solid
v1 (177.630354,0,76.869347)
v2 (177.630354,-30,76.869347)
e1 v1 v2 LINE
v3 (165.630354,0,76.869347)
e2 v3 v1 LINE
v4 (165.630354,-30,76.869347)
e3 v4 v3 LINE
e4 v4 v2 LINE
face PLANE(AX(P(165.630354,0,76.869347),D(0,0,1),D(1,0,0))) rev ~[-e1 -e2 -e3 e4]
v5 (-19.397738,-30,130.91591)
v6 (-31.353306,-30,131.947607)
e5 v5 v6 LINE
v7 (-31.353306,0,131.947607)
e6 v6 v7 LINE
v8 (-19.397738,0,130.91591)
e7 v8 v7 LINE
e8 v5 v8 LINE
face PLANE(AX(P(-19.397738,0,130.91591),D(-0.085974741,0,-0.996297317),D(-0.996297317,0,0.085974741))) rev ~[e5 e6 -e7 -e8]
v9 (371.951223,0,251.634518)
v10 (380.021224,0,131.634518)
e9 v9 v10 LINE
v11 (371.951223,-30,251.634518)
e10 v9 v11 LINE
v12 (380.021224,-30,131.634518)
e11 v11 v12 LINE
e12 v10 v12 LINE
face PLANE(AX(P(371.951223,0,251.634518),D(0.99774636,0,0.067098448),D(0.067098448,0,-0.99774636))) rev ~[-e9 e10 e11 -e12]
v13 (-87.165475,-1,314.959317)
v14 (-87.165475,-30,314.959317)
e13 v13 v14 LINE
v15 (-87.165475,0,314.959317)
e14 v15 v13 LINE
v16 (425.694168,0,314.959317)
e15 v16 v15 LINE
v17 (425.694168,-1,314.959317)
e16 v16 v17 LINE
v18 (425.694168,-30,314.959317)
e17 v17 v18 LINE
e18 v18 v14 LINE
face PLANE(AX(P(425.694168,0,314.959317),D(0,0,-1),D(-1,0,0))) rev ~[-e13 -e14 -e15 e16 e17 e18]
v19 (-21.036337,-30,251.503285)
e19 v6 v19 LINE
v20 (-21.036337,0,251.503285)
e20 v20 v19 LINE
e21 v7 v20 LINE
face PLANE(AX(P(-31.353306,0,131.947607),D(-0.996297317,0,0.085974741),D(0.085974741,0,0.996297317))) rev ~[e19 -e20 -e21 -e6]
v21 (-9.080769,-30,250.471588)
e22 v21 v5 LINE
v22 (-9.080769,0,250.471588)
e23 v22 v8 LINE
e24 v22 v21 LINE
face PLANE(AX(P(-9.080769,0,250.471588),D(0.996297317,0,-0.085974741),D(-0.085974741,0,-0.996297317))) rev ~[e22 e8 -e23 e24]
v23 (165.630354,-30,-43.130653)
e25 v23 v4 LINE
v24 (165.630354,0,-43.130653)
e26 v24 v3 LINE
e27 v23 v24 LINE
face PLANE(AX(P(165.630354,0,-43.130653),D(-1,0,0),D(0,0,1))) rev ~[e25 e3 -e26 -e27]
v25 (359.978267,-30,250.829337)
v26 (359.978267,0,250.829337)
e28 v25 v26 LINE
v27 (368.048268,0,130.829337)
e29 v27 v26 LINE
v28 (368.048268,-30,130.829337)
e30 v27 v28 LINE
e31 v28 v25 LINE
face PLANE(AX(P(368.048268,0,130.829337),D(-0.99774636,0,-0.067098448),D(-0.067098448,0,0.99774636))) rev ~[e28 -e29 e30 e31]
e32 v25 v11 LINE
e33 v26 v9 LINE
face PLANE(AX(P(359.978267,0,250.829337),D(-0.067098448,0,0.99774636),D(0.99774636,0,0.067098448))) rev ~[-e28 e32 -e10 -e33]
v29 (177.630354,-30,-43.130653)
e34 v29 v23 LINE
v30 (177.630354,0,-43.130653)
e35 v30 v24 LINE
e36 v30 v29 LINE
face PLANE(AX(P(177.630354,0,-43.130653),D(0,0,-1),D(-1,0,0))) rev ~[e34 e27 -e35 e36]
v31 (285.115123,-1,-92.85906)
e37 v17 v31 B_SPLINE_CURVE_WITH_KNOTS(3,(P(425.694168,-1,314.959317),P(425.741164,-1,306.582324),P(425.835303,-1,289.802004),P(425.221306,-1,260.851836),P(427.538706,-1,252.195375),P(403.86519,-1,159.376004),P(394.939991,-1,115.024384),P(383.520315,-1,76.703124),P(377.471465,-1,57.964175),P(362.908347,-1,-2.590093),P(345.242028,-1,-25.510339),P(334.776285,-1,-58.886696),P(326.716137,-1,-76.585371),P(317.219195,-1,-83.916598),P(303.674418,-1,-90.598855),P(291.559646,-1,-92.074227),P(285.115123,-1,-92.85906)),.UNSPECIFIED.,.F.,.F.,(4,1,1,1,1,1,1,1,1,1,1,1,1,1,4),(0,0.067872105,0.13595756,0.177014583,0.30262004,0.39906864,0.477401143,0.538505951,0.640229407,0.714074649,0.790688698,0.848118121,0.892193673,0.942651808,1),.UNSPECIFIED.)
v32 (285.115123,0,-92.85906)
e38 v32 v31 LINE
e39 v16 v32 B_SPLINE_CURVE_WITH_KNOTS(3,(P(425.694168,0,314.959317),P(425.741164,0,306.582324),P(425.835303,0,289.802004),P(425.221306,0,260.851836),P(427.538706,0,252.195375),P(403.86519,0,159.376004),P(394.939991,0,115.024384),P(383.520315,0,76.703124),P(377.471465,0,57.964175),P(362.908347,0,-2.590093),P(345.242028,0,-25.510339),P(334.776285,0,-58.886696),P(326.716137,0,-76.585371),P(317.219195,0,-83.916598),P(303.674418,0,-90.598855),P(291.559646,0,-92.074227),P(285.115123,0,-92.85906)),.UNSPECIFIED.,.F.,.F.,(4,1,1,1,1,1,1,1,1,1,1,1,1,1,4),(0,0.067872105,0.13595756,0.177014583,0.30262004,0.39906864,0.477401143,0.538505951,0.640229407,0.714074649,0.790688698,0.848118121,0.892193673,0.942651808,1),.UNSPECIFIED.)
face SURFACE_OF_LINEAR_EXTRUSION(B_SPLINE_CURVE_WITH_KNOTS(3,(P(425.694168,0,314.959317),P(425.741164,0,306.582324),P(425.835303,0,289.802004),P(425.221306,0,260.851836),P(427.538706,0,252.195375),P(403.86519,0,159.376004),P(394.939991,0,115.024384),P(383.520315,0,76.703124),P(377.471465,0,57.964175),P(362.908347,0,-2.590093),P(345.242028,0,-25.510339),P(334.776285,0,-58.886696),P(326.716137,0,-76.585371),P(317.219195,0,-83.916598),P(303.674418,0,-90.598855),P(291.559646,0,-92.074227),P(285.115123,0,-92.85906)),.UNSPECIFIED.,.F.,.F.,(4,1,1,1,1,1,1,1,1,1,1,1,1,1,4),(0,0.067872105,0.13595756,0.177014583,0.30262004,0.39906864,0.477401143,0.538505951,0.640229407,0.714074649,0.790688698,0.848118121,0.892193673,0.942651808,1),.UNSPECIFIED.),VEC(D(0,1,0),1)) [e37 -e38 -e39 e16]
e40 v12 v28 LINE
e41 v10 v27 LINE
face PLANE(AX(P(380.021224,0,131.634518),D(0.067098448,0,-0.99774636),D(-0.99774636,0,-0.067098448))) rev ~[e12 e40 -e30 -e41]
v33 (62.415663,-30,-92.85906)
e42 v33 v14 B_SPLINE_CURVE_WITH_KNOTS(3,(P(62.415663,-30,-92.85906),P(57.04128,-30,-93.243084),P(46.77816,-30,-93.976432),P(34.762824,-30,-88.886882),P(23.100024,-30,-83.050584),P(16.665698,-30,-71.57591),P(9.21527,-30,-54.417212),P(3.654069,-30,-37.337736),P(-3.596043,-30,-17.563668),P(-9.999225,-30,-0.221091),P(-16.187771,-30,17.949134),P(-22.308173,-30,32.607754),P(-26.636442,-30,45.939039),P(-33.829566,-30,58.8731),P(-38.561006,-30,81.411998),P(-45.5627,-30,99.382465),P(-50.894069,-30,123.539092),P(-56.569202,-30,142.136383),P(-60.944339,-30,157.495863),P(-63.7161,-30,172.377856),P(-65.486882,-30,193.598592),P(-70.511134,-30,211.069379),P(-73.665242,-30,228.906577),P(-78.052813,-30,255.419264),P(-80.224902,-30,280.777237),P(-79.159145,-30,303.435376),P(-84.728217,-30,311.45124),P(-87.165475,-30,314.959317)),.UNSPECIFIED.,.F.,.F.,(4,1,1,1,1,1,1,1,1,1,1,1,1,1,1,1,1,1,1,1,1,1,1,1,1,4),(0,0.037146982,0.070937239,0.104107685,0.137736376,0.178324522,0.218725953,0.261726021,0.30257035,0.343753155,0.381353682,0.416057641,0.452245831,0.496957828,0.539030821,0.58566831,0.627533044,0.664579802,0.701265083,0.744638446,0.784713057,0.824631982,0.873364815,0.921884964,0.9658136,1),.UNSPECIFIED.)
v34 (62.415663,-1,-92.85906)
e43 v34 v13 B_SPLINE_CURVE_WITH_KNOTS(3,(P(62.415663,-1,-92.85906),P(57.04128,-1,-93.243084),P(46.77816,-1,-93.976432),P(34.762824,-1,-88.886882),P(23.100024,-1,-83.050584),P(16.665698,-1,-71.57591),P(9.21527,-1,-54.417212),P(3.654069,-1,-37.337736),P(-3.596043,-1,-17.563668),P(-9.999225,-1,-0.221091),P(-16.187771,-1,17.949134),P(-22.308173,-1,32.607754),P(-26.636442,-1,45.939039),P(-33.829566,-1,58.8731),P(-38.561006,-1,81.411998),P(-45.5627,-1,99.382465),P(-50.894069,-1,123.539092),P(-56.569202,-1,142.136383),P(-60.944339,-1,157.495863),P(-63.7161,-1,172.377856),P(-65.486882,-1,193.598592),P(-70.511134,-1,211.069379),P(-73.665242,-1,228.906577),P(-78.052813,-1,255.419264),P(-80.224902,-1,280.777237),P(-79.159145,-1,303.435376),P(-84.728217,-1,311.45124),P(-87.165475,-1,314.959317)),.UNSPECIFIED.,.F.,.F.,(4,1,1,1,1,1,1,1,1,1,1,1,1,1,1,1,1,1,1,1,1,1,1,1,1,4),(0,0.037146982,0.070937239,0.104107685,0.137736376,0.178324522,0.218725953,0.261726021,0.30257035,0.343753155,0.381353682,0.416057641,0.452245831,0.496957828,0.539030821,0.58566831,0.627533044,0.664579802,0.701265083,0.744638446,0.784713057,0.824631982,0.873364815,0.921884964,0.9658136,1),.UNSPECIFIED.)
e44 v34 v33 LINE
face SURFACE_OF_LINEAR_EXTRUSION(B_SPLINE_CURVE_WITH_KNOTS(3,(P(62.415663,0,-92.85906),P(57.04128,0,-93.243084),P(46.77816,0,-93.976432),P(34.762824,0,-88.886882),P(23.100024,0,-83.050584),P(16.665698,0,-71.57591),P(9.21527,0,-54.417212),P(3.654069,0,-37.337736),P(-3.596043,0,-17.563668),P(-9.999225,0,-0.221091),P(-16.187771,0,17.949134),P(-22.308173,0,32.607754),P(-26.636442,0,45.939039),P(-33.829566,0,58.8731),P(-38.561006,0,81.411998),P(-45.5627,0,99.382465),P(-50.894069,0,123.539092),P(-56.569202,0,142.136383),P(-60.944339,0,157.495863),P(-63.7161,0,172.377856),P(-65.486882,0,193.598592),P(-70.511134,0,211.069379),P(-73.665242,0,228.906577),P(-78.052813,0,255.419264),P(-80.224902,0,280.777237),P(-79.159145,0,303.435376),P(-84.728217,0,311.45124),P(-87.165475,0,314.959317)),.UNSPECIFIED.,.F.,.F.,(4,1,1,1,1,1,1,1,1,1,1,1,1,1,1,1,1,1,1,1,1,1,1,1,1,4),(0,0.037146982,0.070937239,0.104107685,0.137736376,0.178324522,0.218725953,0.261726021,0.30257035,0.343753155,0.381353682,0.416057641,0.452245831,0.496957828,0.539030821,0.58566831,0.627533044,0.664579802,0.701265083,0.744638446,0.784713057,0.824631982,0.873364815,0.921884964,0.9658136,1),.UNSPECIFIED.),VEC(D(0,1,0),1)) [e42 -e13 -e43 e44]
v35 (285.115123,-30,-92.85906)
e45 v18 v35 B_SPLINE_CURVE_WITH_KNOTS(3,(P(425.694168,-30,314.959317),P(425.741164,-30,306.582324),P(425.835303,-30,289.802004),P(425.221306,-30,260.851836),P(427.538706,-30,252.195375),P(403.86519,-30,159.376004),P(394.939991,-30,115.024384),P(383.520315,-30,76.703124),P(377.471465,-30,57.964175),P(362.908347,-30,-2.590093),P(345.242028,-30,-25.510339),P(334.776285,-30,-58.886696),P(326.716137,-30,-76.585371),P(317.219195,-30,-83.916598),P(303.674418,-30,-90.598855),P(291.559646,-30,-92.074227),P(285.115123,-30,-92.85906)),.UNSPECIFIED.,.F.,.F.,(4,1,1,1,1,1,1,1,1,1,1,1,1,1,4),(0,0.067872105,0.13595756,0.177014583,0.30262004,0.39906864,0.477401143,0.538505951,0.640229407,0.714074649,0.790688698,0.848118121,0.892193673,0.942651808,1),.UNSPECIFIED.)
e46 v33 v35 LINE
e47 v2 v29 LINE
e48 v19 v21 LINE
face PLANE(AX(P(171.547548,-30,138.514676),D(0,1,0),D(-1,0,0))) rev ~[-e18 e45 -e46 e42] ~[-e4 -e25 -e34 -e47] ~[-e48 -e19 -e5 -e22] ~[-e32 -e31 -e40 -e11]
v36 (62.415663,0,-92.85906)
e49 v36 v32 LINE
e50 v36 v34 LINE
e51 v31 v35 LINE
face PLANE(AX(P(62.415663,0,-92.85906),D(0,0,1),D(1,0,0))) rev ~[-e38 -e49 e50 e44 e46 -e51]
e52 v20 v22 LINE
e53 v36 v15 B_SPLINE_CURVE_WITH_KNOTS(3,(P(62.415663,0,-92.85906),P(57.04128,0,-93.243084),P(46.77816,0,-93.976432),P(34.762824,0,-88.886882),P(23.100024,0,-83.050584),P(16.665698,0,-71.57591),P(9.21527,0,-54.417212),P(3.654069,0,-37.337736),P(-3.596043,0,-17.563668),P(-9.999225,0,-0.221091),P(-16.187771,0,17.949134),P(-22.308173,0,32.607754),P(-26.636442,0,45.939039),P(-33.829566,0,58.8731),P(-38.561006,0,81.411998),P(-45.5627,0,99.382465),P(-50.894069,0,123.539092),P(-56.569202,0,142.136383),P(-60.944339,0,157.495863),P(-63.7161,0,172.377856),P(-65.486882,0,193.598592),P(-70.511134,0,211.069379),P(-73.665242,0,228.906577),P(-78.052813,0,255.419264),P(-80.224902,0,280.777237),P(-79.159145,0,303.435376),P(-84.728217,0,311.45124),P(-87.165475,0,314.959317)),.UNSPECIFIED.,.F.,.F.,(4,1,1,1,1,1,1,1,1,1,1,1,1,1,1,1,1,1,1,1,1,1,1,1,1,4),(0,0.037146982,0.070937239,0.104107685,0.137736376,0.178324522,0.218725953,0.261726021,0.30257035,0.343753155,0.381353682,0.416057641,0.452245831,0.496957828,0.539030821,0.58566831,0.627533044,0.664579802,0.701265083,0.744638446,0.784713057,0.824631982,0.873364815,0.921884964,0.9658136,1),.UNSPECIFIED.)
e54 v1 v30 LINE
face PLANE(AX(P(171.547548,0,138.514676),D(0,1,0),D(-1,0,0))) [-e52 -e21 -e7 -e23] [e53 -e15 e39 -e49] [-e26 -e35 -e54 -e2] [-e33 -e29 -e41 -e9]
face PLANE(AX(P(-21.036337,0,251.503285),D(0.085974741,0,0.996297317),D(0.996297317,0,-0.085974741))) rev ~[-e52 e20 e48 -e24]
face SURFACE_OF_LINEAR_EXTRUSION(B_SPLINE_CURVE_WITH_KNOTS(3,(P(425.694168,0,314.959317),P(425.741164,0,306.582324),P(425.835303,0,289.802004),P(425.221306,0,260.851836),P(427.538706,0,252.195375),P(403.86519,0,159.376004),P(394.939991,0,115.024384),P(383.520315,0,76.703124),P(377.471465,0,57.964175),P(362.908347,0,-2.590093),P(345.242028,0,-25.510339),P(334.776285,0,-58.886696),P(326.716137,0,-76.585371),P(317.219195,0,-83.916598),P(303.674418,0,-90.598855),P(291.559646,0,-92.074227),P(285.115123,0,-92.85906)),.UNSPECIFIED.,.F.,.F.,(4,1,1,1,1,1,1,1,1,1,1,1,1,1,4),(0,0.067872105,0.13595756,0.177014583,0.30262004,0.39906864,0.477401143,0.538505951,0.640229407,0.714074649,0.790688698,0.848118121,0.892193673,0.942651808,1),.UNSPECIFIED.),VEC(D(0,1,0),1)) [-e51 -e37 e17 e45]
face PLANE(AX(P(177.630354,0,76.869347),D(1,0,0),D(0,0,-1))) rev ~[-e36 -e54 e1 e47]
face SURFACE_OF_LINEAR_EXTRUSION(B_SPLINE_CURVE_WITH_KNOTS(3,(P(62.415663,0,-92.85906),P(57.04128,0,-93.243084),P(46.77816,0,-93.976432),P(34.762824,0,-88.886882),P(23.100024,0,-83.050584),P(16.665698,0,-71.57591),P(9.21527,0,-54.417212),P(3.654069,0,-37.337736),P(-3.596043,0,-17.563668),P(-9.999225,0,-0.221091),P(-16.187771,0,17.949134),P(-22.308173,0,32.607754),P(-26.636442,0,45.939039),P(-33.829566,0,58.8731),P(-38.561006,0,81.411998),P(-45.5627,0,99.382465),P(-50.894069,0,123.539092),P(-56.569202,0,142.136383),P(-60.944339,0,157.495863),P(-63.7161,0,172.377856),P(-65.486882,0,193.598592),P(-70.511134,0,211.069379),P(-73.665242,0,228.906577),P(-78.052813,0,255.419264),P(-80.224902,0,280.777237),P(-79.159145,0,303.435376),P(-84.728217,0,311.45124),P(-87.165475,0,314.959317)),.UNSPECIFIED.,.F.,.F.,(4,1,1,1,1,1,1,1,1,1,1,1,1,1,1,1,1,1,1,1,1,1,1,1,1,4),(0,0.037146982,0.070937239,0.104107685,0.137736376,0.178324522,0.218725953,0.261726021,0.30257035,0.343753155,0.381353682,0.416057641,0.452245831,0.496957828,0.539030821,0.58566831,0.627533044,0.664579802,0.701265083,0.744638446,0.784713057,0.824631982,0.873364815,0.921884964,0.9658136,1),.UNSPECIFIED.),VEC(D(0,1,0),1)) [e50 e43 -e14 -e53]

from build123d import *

# Parameters (mm, degrees)
F1_DEPTH = 1
F2_DEPTH = 30


# Not quite as in the source:
# - a feature names something its author has since deleted; it is built from what else it names


with BuildPart() as f1:
    # F0 (on Front) → F1 (new body)
    with BuildSketch(Plane.XZ):
        with BuildLine():
            add(Edge.make_bspline(
                [(425.694167614, 314.9593174458), (425.7411635664, 306.5823239179), (425.8353031998, 289.8020043845), (425.2213058119, 260.8518364023), (427.5387063586, 252.1953752472), (403.8651896897, 159.3760040825), (394.9399909924, 115.0243838579), (383.5203150006, 76.7031238113), (377.471464527, 57.9641754851), (362.9083470803, -2.5900933423), (345.2420278931, -25.5103393777), (334.7762850188, -58.8866961253), (326.7161367987, -76.5853711865), (317.2191947156, -83.9165976747), (303.6744184479, -90.5988549349), (291.5596455088, -92.0742269797), (285.1151227951, -92.8590595722)],
                knots=[0, 0, 0, 0, 0.0678721046, 0.1359575603, 0.1770145832, 0.3026200399, 0.39906864, 0.477401143, 0.5385059508, 0.6402294069, 0.7140746489, 0.7906886976, 0.8481181215, 0.8921936726, 0.9426518079, 1, 1, 1, 1], degree=3))
            Line((425.694167614, 314.9593174458), (-87.1654751293, 314.9593174458))
            add(Edge.make_bspline(
                [(62.4156631529, -92.8590595722), (57.0412799038, -93.2430841848), (46.7781604835, -93.9764316735), (34.762824297, -88.8868818229), (23.1000241889, -83.0505840006), (16.6656980071, -71.5759104343), (9.2152702261, -54.4172118892), (3.6540691421, -37.3377357492), (-3.596042902, -17.563668233), (-9.9992245943, -0.2210912492), (-16.1877714037, 17.9491344863), (-22.3081726097, 32.6077543724), (-26.6364419857, 45.9390385377), (-33.8295661577, 58.8731002038), (-38.5610064547, 81.4119978236), (-45.5627001907, 99.3824651482), (-50.8940688236, 123.5390915977), (-56.5692018159, 142.1363827936), (-60.9443389374, 157.495862805), (-63.7160996981, 172.3778561971), (-65.4868817968, 193.5985919764), (-70.5111342627, 211.0693794771), (-73.6652423642, 228.9065774682), (-78.0528125256, 255.4192638339), (-80.2249024033, 280.7772367064), (-79.1591451026, 303.4353757219), (-84.7282168765, 311.4512404644), (-87.1654751293, 314.9593174458)],
                knots=[0, 0, 0, 0, 0.0371469817, 0.070937239, 0.1041076852, 0.1377363763, 0.1783245219, 0.2187259528, 0.2617260214, 0.3025703504, 0.3437531553, 0.3813536818, 0.4160576409, 0.4522458314, 0.496957828, 0.5390308214, 0.5856683097, 0.6275330442, 0.6645798021, 0.7012650834, 0.7446384462, 0.7847130572, 0.8246319824, 0.8733648148, 0.9218849639, 0.9658135998, 1, 1, 1, 1], degree=3))
            Line((62.4156631529, -92.8590595722), (285.1151227951, -92.8590595722))
        make_face()
        Polygon((165.6303541942, 76.8693466235), (171.6303541942, 76.8693466235), (177.6303541942, 76.8693466235), (177.6303541942, -43.1306533765), (171.6303541942, -43.1306533765), (165.6303541942, -43.1306533765), align=None, mode=Mode.SUBTRACT)
        Polygon((-31.3533060253, 131.947606802), (-21.0363371185, 251.5032848461), (-9.0807693141, 250.4715879554), (-19.3977382209, 130.9159099113), align=None, mode=Mode.SUBTRACT)
        Polygon((359.9782669565, 250.8293367838), (371.9512232727, 251.634518161), (380.0212239228, 131.634518161), (368.0482676066, 130.8293367838), align=None, mode=Mode.SUBTRACT)
    extrude(amount=F1_DEPTH)

    # F0 (on Front) → F2 (join)
    with BuildSketch(Plane.XZ):
        with BuildLine():
            add(Edge.make_bspline(
                [(425.694167614, 314.9593174458), (425.7411635664, 306.5823239179), (425.8353031998, 289.8020043845), (425.2213058119, 260.8518364023), (427.5387063586, 252.1953752472), (403.8651896897, 159.3760040825), (394.9399909924, 115.0243838579), (383.5203150006, 76.7031238113), (377.471464527, 57.9641754851), (362.9083470803, -2.5900933423), (345.2420278931, -25.5103393777), (334.7762850188, -58.8866961253), (326.7161367987, -76.5853711865), (317.2191947156, -83.9165976747), (303.6744184479, -90.5988549349), (291.5596455088, -92.0742269797), (285.1151227951, -92.8590595722)],
                knots=[0, 0, 0, 0, 0.0678721046, 0.1359575603, 0.1770145832, 0.3026200399, 0.39906864, 0.477401143, 0.5385059508, 0.6402294069, 0.7140746489, 0.7906886976, 0.8481181215, 0.8921936726, 0.9426518079, 1, 1, 1, 1], degree=3))
            Line((425.694167614, 314.9593174458), (-87.1654751293, 314.9593174458))
            add(Edge.make_bspline(
                [(62.4156631529, -92.8590595722), (57.0412799038, -93.2430841848), (46.7781604835, -93.9764316735), (34.762824297, -88.8868818229), (23.1000241889, -83.0505840006), (16.6656980071, -71.5759104343), (9.2152702261, -54.4172118892), (3.6540691421, -37.3377357492), (-3.596042902, -17.563668233), (-9.9992245943, -0.2210912492), (-16.1877714037, 17.9491344863), (-22.3081726097, 32.6077543724), (-26.6364419857, 45.9390385377), (-33.8295661577, 58.8731002038), (-38.5610064547, 81.4119978236), (-45.5627001907, 99.3824651482), (-50.8940688236, 123.5390915977), (-56.5692018159, 142.1363827936), (-60.9443389374, 157.495862805), (-63.7160996981, 172.3778561971), (-65.4868817968, 193.5985919764), (-70.5111342627, 211.0693794771), (-73.6652423642, 228.9065774682), (-78.0528125256, 255.4192638339), (-80.2249024033, 280.7772367064), (-79.1591451026, 303.4353757219), (-84.7282168765, 311.4512404644), (-87.1654751293, 314.9593174458)],
                knots=[0, 0, 0, 0, 0.0371469817, 0.070937239, 0.1041076852, 0.1377363763, 0.1783245219, 0.2187259528, 0.2617260214, 0.3025703504, 0.3437531553, 0.3813536818, 0.4160576409, 0.4522458314, 0.496957828, 0.5390308214, 0.5856683097, 0.6275330442, 0.6645798021, 0.7012650834, 0.7446384462, 0.7847130572, 0.8246319824, 0.8733648148, 0.9218849639, 0.9658135998, 1, 1, 1, 1], degree=3))
            Line((62.4156631529, -92.8590595722), (285.1151227951, -92.8590595722))
        make_face()
        Polygon((165.6303541942, 76.8693466235), (171.6303541942, 76.8693466235), (177.6303541942, 76.8693466235), (177.6303541942, -43.1306533765), (171.6303541942, -43.1306533765), (165.6303541942, -43.1306533765), align=None, mode=Mode.SUBTRACT)
        Polygon((-31.3533060253, 131.947606802), (-21.0363371185, 251.5032848461), (-9.0807693141, 250.4715879554), (-19.3977382209, 130.9159099113), align=None, mode=Mode.SUBTRACT)
        Polygon((359.9782669565, 250.8293367838), (371.9512232727, 251.634518161), (380.0212239228, 131.634518161), (368.0482676066, 130.8293367838), align=None, mode=Mode.SUBTRACT)
    extrude(amount=F2_DEPTH)


solid = f1.part
